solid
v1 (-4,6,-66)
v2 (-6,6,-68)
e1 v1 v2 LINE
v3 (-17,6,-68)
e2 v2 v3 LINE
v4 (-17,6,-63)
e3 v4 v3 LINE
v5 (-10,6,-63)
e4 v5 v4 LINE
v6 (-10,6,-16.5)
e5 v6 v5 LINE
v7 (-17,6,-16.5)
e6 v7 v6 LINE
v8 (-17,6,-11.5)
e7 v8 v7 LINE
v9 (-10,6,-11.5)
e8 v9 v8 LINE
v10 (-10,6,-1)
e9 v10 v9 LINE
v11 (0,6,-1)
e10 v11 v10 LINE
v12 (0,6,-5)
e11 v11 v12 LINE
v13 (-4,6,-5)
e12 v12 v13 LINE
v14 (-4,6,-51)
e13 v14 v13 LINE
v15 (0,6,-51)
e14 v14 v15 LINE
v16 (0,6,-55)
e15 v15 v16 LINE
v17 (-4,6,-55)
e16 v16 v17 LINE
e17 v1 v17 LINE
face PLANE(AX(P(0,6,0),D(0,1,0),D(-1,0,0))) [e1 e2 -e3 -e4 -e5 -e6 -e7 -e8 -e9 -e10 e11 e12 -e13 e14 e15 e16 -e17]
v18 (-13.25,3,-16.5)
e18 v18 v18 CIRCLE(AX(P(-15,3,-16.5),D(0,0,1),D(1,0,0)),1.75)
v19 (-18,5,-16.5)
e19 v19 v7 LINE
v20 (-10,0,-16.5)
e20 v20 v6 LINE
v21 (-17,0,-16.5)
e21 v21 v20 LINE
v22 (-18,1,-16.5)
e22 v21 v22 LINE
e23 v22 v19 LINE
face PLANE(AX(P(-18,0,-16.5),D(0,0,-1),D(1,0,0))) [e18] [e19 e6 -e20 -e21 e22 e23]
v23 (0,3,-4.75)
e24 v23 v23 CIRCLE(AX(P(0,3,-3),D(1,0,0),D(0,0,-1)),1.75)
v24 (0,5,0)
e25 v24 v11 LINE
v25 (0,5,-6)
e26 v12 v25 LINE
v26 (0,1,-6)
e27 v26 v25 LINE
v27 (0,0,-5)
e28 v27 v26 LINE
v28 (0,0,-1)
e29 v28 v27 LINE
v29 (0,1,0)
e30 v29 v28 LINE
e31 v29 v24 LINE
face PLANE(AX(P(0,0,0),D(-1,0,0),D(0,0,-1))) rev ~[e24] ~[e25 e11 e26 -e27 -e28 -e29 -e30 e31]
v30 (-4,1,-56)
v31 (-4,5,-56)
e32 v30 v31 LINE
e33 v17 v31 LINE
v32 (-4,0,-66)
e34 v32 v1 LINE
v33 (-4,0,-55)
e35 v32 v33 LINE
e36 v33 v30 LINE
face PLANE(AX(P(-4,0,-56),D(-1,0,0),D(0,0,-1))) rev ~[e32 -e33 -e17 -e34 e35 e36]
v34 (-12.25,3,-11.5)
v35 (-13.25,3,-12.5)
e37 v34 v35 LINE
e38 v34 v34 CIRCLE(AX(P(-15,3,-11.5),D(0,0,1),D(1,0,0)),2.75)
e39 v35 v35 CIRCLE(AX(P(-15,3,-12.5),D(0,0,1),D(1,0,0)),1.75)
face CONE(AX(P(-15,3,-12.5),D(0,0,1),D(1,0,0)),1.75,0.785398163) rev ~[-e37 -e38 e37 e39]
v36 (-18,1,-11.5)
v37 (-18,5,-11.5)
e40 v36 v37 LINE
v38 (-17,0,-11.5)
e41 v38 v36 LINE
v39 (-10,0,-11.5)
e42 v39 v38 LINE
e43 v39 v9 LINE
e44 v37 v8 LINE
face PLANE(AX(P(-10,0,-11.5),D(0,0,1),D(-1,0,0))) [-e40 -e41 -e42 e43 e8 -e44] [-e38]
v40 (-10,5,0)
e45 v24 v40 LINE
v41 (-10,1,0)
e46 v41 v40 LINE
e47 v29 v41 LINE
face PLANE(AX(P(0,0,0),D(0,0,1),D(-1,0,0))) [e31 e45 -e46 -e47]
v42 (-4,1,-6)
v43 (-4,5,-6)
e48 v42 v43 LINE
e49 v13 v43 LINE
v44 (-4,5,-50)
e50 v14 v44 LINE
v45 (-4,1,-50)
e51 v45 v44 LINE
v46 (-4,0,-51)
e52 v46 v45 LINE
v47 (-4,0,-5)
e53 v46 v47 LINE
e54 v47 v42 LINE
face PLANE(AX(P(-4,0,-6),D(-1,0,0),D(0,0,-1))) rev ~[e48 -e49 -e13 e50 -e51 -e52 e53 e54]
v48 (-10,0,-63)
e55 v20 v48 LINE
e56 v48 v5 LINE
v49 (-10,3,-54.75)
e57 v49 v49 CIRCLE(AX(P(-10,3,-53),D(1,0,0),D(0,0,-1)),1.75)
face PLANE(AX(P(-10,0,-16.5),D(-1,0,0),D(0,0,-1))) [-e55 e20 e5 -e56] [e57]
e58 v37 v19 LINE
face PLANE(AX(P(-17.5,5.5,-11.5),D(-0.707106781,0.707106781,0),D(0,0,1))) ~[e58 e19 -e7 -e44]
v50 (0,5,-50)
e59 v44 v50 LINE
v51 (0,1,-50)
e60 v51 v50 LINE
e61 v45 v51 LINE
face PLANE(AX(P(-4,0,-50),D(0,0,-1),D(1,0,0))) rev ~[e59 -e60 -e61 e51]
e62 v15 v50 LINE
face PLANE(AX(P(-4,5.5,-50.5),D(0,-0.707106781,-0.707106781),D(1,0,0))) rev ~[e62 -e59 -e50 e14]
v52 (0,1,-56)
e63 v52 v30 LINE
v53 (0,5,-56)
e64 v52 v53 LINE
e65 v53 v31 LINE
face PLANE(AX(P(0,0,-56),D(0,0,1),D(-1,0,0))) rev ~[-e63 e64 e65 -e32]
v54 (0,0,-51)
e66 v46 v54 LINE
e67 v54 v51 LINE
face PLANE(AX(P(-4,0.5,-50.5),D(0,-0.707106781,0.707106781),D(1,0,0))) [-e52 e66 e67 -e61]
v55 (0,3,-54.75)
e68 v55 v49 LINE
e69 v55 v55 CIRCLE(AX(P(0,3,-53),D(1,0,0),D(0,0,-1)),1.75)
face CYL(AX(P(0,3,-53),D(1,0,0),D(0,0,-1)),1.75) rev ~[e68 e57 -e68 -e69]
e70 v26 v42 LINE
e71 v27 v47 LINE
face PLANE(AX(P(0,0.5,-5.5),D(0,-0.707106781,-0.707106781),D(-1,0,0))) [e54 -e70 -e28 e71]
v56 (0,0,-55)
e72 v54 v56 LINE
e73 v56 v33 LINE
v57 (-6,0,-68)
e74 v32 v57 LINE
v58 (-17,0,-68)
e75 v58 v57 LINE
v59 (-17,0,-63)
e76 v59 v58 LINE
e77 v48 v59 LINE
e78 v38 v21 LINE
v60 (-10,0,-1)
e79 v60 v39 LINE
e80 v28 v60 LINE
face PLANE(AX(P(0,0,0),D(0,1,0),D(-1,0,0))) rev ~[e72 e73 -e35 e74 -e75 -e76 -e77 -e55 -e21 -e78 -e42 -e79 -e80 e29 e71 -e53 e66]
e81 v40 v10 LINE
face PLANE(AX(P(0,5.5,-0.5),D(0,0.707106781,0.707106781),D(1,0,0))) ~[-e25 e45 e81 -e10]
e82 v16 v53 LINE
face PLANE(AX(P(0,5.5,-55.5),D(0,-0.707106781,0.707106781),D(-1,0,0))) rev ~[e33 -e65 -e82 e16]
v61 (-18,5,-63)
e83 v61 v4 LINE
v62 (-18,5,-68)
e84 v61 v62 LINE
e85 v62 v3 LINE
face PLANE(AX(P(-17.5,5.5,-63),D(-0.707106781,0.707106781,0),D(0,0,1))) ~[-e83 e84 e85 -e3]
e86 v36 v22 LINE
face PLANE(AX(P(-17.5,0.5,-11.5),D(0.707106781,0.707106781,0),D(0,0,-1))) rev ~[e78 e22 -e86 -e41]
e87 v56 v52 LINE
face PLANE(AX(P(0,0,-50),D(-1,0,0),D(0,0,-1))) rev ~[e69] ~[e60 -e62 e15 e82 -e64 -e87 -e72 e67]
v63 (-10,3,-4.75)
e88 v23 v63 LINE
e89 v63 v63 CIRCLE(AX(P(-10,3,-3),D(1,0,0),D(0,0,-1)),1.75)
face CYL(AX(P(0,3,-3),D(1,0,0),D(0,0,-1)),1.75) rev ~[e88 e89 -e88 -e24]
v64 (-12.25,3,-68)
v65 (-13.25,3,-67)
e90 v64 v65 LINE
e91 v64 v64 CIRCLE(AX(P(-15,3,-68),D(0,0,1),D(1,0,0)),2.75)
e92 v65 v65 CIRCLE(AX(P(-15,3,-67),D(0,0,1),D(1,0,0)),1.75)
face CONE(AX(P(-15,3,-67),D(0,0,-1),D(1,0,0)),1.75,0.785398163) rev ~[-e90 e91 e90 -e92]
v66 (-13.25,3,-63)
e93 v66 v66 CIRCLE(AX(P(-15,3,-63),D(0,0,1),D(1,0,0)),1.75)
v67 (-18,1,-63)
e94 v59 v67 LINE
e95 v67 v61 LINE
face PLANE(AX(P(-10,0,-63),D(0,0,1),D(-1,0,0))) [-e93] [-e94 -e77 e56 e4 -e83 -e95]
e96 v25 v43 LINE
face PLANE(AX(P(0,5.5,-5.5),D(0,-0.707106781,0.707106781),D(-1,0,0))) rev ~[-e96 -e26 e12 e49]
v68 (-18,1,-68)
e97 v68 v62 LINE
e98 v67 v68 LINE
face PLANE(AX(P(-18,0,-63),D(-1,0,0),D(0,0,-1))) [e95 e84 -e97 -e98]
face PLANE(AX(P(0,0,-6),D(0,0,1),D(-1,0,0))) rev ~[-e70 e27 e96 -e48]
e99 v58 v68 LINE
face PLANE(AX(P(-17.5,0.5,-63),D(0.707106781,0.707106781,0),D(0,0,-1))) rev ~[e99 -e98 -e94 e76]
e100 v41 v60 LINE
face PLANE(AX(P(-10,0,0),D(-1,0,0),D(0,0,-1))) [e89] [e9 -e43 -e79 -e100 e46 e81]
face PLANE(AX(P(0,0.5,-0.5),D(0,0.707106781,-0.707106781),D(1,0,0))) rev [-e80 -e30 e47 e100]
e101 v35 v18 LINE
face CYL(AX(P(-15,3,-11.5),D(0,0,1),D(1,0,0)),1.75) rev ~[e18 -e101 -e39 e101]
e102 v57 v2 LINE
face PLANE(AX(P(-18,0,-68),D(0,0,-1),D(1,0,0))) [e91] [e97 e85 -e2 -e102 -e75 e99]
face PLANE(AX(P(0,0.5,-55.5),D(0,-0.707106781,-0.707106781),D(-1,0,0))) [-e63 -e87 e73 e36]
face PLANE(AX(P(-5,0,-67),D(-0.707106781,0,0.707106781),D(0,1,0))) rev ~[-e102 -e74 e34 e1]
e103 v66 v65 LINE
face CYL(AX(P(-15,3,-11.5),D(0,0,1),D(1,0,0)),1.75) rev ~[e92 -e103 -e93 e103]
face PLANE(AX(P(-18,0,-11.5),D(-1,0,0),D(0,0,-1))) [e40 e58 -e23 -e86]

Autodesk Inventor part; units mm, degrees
ref_plane "YZ Plane" through (0, 0, 0) normal (1, 0, 0) x (0, 1, 0)
ref_plane "XZ Plane" through (0, 0, 0) normal (0, 1, 0) x (-1, 0, 0)
ref_plane "XY Plane" through (0, 0, 0) normal (0, 0, 1) x (1, 0, 0)
sketch "Sketch1" plane through (0, 0, 0) normal (0, 1, 0) x (-1, 0, 0)
  line L0 (0, 0) -> (0, -6)
  line L1 (0, -6) -> (4, -6)
  line L2 (4, -6) -> (4, -50)
  line L3 (4, -50) -> (0, -50)
  line L4 (0, -50) -> (0, -56)
  line L5 (0, 0) -> (10, 0)
  line L6 (0, 0) -> (10, 0)
  line L7 (10, 0) -> (10, -11.5)
  line L8 (10, -11.5) -> (18, -11.5)
  line L9 (18, -11.5) -> (18, -16.5)
  line L10 (18, -16.5) -> (10, -16.5)
  line L11 (10, -16.5) -> (10, -63)
  line L12 (10, -63) -> (18, -63)
  line L13 (18, -63) -> (18, -68)
  line L14 (18, -68) -> (10, -68)
  line L15 (0, -56) -> (4, -56)
  line L16 (4, -56) -> (4, -68)
  line L17 (4, -68) -> (10, -68)
  point P0 (0, -3)
  point P1 (0, -53)
  dimension "d2" = 50
  dimension "d3" = 6
  dimension "d4" = 4
  dimension "d19" = 6
  dimension "d20" = 11.5
  dimension "d21" = 5
  dimension "d22" = 8
  dimension "d23" = 46.5
extrude "Extrusion1" add sketch "Sketch1" along normal blind 6
sketch "Sketch4" plane through (0, 0, -50) normal (1, 0, 0) x (0, 0, -1)
  line L0 (-44, 0) -> (0, 0) projected
  line L1 (-50, 0) -> (-50, 6) projected
  line L2 (-44, 0) -> (-50, 6) construction
  circle A0 centre (-47, 3) radius 1.75
  line L3 (0, 0) -> (6, 0) projected
  line L4 (-44, 6) -> (0, 6) projected
  line L5 (6, 0) -> (0, 6) construction
  circle A1 centre (3, 3) radius 1.75
  dimension "d24" = 3.5
extrude "Extrusion4" cut sketch "Sketch4" against normal through all
chamfer "Chamfer2" distance 1 angle 45 8 edges at (-5, 6, 0) (-2, 6, -6) (-2, 0, -6) (-5, 0, 0) (-2, 0, -50) (-2, 6, -50) (-2, 0, -56) (-2, 6, -56)
chamfer "Chamfer3" distance 2 angle 45 1 edges at (-4, 3, -68)
sketch "Sketch5" plane through (-18, 0, -11.5) normal (0, 0, 1) x (1, 0, 0)
  circle A0 centre (3, 3) radius 3 construction
  line L0 (0, 6) -> (8, 6) projected
  line L1 (0, 0) -> (0, 6) projected
  line L2 (0, 0) -> (8, 0) projected
  circle A1 centre (3, 3) radius 1.75
  point P0 (18, 0)
  dimension "d33" = 3.5
chamfer "Chamfer4" distance 1 angle 45 4 edges at (-18, 0, -65.5) (-18, 6, -65.5) (-18, 0, -14) (-18, 6, -14)
extrude "Extrusion5" cut sketch "Sketch5" against normal through all
chamfer "Chamfer5" distance 1 angle 45 2 edges at (-16.75, 3, -11.5) (-16.75, 3, -68)
properties part number "camadapter2"
